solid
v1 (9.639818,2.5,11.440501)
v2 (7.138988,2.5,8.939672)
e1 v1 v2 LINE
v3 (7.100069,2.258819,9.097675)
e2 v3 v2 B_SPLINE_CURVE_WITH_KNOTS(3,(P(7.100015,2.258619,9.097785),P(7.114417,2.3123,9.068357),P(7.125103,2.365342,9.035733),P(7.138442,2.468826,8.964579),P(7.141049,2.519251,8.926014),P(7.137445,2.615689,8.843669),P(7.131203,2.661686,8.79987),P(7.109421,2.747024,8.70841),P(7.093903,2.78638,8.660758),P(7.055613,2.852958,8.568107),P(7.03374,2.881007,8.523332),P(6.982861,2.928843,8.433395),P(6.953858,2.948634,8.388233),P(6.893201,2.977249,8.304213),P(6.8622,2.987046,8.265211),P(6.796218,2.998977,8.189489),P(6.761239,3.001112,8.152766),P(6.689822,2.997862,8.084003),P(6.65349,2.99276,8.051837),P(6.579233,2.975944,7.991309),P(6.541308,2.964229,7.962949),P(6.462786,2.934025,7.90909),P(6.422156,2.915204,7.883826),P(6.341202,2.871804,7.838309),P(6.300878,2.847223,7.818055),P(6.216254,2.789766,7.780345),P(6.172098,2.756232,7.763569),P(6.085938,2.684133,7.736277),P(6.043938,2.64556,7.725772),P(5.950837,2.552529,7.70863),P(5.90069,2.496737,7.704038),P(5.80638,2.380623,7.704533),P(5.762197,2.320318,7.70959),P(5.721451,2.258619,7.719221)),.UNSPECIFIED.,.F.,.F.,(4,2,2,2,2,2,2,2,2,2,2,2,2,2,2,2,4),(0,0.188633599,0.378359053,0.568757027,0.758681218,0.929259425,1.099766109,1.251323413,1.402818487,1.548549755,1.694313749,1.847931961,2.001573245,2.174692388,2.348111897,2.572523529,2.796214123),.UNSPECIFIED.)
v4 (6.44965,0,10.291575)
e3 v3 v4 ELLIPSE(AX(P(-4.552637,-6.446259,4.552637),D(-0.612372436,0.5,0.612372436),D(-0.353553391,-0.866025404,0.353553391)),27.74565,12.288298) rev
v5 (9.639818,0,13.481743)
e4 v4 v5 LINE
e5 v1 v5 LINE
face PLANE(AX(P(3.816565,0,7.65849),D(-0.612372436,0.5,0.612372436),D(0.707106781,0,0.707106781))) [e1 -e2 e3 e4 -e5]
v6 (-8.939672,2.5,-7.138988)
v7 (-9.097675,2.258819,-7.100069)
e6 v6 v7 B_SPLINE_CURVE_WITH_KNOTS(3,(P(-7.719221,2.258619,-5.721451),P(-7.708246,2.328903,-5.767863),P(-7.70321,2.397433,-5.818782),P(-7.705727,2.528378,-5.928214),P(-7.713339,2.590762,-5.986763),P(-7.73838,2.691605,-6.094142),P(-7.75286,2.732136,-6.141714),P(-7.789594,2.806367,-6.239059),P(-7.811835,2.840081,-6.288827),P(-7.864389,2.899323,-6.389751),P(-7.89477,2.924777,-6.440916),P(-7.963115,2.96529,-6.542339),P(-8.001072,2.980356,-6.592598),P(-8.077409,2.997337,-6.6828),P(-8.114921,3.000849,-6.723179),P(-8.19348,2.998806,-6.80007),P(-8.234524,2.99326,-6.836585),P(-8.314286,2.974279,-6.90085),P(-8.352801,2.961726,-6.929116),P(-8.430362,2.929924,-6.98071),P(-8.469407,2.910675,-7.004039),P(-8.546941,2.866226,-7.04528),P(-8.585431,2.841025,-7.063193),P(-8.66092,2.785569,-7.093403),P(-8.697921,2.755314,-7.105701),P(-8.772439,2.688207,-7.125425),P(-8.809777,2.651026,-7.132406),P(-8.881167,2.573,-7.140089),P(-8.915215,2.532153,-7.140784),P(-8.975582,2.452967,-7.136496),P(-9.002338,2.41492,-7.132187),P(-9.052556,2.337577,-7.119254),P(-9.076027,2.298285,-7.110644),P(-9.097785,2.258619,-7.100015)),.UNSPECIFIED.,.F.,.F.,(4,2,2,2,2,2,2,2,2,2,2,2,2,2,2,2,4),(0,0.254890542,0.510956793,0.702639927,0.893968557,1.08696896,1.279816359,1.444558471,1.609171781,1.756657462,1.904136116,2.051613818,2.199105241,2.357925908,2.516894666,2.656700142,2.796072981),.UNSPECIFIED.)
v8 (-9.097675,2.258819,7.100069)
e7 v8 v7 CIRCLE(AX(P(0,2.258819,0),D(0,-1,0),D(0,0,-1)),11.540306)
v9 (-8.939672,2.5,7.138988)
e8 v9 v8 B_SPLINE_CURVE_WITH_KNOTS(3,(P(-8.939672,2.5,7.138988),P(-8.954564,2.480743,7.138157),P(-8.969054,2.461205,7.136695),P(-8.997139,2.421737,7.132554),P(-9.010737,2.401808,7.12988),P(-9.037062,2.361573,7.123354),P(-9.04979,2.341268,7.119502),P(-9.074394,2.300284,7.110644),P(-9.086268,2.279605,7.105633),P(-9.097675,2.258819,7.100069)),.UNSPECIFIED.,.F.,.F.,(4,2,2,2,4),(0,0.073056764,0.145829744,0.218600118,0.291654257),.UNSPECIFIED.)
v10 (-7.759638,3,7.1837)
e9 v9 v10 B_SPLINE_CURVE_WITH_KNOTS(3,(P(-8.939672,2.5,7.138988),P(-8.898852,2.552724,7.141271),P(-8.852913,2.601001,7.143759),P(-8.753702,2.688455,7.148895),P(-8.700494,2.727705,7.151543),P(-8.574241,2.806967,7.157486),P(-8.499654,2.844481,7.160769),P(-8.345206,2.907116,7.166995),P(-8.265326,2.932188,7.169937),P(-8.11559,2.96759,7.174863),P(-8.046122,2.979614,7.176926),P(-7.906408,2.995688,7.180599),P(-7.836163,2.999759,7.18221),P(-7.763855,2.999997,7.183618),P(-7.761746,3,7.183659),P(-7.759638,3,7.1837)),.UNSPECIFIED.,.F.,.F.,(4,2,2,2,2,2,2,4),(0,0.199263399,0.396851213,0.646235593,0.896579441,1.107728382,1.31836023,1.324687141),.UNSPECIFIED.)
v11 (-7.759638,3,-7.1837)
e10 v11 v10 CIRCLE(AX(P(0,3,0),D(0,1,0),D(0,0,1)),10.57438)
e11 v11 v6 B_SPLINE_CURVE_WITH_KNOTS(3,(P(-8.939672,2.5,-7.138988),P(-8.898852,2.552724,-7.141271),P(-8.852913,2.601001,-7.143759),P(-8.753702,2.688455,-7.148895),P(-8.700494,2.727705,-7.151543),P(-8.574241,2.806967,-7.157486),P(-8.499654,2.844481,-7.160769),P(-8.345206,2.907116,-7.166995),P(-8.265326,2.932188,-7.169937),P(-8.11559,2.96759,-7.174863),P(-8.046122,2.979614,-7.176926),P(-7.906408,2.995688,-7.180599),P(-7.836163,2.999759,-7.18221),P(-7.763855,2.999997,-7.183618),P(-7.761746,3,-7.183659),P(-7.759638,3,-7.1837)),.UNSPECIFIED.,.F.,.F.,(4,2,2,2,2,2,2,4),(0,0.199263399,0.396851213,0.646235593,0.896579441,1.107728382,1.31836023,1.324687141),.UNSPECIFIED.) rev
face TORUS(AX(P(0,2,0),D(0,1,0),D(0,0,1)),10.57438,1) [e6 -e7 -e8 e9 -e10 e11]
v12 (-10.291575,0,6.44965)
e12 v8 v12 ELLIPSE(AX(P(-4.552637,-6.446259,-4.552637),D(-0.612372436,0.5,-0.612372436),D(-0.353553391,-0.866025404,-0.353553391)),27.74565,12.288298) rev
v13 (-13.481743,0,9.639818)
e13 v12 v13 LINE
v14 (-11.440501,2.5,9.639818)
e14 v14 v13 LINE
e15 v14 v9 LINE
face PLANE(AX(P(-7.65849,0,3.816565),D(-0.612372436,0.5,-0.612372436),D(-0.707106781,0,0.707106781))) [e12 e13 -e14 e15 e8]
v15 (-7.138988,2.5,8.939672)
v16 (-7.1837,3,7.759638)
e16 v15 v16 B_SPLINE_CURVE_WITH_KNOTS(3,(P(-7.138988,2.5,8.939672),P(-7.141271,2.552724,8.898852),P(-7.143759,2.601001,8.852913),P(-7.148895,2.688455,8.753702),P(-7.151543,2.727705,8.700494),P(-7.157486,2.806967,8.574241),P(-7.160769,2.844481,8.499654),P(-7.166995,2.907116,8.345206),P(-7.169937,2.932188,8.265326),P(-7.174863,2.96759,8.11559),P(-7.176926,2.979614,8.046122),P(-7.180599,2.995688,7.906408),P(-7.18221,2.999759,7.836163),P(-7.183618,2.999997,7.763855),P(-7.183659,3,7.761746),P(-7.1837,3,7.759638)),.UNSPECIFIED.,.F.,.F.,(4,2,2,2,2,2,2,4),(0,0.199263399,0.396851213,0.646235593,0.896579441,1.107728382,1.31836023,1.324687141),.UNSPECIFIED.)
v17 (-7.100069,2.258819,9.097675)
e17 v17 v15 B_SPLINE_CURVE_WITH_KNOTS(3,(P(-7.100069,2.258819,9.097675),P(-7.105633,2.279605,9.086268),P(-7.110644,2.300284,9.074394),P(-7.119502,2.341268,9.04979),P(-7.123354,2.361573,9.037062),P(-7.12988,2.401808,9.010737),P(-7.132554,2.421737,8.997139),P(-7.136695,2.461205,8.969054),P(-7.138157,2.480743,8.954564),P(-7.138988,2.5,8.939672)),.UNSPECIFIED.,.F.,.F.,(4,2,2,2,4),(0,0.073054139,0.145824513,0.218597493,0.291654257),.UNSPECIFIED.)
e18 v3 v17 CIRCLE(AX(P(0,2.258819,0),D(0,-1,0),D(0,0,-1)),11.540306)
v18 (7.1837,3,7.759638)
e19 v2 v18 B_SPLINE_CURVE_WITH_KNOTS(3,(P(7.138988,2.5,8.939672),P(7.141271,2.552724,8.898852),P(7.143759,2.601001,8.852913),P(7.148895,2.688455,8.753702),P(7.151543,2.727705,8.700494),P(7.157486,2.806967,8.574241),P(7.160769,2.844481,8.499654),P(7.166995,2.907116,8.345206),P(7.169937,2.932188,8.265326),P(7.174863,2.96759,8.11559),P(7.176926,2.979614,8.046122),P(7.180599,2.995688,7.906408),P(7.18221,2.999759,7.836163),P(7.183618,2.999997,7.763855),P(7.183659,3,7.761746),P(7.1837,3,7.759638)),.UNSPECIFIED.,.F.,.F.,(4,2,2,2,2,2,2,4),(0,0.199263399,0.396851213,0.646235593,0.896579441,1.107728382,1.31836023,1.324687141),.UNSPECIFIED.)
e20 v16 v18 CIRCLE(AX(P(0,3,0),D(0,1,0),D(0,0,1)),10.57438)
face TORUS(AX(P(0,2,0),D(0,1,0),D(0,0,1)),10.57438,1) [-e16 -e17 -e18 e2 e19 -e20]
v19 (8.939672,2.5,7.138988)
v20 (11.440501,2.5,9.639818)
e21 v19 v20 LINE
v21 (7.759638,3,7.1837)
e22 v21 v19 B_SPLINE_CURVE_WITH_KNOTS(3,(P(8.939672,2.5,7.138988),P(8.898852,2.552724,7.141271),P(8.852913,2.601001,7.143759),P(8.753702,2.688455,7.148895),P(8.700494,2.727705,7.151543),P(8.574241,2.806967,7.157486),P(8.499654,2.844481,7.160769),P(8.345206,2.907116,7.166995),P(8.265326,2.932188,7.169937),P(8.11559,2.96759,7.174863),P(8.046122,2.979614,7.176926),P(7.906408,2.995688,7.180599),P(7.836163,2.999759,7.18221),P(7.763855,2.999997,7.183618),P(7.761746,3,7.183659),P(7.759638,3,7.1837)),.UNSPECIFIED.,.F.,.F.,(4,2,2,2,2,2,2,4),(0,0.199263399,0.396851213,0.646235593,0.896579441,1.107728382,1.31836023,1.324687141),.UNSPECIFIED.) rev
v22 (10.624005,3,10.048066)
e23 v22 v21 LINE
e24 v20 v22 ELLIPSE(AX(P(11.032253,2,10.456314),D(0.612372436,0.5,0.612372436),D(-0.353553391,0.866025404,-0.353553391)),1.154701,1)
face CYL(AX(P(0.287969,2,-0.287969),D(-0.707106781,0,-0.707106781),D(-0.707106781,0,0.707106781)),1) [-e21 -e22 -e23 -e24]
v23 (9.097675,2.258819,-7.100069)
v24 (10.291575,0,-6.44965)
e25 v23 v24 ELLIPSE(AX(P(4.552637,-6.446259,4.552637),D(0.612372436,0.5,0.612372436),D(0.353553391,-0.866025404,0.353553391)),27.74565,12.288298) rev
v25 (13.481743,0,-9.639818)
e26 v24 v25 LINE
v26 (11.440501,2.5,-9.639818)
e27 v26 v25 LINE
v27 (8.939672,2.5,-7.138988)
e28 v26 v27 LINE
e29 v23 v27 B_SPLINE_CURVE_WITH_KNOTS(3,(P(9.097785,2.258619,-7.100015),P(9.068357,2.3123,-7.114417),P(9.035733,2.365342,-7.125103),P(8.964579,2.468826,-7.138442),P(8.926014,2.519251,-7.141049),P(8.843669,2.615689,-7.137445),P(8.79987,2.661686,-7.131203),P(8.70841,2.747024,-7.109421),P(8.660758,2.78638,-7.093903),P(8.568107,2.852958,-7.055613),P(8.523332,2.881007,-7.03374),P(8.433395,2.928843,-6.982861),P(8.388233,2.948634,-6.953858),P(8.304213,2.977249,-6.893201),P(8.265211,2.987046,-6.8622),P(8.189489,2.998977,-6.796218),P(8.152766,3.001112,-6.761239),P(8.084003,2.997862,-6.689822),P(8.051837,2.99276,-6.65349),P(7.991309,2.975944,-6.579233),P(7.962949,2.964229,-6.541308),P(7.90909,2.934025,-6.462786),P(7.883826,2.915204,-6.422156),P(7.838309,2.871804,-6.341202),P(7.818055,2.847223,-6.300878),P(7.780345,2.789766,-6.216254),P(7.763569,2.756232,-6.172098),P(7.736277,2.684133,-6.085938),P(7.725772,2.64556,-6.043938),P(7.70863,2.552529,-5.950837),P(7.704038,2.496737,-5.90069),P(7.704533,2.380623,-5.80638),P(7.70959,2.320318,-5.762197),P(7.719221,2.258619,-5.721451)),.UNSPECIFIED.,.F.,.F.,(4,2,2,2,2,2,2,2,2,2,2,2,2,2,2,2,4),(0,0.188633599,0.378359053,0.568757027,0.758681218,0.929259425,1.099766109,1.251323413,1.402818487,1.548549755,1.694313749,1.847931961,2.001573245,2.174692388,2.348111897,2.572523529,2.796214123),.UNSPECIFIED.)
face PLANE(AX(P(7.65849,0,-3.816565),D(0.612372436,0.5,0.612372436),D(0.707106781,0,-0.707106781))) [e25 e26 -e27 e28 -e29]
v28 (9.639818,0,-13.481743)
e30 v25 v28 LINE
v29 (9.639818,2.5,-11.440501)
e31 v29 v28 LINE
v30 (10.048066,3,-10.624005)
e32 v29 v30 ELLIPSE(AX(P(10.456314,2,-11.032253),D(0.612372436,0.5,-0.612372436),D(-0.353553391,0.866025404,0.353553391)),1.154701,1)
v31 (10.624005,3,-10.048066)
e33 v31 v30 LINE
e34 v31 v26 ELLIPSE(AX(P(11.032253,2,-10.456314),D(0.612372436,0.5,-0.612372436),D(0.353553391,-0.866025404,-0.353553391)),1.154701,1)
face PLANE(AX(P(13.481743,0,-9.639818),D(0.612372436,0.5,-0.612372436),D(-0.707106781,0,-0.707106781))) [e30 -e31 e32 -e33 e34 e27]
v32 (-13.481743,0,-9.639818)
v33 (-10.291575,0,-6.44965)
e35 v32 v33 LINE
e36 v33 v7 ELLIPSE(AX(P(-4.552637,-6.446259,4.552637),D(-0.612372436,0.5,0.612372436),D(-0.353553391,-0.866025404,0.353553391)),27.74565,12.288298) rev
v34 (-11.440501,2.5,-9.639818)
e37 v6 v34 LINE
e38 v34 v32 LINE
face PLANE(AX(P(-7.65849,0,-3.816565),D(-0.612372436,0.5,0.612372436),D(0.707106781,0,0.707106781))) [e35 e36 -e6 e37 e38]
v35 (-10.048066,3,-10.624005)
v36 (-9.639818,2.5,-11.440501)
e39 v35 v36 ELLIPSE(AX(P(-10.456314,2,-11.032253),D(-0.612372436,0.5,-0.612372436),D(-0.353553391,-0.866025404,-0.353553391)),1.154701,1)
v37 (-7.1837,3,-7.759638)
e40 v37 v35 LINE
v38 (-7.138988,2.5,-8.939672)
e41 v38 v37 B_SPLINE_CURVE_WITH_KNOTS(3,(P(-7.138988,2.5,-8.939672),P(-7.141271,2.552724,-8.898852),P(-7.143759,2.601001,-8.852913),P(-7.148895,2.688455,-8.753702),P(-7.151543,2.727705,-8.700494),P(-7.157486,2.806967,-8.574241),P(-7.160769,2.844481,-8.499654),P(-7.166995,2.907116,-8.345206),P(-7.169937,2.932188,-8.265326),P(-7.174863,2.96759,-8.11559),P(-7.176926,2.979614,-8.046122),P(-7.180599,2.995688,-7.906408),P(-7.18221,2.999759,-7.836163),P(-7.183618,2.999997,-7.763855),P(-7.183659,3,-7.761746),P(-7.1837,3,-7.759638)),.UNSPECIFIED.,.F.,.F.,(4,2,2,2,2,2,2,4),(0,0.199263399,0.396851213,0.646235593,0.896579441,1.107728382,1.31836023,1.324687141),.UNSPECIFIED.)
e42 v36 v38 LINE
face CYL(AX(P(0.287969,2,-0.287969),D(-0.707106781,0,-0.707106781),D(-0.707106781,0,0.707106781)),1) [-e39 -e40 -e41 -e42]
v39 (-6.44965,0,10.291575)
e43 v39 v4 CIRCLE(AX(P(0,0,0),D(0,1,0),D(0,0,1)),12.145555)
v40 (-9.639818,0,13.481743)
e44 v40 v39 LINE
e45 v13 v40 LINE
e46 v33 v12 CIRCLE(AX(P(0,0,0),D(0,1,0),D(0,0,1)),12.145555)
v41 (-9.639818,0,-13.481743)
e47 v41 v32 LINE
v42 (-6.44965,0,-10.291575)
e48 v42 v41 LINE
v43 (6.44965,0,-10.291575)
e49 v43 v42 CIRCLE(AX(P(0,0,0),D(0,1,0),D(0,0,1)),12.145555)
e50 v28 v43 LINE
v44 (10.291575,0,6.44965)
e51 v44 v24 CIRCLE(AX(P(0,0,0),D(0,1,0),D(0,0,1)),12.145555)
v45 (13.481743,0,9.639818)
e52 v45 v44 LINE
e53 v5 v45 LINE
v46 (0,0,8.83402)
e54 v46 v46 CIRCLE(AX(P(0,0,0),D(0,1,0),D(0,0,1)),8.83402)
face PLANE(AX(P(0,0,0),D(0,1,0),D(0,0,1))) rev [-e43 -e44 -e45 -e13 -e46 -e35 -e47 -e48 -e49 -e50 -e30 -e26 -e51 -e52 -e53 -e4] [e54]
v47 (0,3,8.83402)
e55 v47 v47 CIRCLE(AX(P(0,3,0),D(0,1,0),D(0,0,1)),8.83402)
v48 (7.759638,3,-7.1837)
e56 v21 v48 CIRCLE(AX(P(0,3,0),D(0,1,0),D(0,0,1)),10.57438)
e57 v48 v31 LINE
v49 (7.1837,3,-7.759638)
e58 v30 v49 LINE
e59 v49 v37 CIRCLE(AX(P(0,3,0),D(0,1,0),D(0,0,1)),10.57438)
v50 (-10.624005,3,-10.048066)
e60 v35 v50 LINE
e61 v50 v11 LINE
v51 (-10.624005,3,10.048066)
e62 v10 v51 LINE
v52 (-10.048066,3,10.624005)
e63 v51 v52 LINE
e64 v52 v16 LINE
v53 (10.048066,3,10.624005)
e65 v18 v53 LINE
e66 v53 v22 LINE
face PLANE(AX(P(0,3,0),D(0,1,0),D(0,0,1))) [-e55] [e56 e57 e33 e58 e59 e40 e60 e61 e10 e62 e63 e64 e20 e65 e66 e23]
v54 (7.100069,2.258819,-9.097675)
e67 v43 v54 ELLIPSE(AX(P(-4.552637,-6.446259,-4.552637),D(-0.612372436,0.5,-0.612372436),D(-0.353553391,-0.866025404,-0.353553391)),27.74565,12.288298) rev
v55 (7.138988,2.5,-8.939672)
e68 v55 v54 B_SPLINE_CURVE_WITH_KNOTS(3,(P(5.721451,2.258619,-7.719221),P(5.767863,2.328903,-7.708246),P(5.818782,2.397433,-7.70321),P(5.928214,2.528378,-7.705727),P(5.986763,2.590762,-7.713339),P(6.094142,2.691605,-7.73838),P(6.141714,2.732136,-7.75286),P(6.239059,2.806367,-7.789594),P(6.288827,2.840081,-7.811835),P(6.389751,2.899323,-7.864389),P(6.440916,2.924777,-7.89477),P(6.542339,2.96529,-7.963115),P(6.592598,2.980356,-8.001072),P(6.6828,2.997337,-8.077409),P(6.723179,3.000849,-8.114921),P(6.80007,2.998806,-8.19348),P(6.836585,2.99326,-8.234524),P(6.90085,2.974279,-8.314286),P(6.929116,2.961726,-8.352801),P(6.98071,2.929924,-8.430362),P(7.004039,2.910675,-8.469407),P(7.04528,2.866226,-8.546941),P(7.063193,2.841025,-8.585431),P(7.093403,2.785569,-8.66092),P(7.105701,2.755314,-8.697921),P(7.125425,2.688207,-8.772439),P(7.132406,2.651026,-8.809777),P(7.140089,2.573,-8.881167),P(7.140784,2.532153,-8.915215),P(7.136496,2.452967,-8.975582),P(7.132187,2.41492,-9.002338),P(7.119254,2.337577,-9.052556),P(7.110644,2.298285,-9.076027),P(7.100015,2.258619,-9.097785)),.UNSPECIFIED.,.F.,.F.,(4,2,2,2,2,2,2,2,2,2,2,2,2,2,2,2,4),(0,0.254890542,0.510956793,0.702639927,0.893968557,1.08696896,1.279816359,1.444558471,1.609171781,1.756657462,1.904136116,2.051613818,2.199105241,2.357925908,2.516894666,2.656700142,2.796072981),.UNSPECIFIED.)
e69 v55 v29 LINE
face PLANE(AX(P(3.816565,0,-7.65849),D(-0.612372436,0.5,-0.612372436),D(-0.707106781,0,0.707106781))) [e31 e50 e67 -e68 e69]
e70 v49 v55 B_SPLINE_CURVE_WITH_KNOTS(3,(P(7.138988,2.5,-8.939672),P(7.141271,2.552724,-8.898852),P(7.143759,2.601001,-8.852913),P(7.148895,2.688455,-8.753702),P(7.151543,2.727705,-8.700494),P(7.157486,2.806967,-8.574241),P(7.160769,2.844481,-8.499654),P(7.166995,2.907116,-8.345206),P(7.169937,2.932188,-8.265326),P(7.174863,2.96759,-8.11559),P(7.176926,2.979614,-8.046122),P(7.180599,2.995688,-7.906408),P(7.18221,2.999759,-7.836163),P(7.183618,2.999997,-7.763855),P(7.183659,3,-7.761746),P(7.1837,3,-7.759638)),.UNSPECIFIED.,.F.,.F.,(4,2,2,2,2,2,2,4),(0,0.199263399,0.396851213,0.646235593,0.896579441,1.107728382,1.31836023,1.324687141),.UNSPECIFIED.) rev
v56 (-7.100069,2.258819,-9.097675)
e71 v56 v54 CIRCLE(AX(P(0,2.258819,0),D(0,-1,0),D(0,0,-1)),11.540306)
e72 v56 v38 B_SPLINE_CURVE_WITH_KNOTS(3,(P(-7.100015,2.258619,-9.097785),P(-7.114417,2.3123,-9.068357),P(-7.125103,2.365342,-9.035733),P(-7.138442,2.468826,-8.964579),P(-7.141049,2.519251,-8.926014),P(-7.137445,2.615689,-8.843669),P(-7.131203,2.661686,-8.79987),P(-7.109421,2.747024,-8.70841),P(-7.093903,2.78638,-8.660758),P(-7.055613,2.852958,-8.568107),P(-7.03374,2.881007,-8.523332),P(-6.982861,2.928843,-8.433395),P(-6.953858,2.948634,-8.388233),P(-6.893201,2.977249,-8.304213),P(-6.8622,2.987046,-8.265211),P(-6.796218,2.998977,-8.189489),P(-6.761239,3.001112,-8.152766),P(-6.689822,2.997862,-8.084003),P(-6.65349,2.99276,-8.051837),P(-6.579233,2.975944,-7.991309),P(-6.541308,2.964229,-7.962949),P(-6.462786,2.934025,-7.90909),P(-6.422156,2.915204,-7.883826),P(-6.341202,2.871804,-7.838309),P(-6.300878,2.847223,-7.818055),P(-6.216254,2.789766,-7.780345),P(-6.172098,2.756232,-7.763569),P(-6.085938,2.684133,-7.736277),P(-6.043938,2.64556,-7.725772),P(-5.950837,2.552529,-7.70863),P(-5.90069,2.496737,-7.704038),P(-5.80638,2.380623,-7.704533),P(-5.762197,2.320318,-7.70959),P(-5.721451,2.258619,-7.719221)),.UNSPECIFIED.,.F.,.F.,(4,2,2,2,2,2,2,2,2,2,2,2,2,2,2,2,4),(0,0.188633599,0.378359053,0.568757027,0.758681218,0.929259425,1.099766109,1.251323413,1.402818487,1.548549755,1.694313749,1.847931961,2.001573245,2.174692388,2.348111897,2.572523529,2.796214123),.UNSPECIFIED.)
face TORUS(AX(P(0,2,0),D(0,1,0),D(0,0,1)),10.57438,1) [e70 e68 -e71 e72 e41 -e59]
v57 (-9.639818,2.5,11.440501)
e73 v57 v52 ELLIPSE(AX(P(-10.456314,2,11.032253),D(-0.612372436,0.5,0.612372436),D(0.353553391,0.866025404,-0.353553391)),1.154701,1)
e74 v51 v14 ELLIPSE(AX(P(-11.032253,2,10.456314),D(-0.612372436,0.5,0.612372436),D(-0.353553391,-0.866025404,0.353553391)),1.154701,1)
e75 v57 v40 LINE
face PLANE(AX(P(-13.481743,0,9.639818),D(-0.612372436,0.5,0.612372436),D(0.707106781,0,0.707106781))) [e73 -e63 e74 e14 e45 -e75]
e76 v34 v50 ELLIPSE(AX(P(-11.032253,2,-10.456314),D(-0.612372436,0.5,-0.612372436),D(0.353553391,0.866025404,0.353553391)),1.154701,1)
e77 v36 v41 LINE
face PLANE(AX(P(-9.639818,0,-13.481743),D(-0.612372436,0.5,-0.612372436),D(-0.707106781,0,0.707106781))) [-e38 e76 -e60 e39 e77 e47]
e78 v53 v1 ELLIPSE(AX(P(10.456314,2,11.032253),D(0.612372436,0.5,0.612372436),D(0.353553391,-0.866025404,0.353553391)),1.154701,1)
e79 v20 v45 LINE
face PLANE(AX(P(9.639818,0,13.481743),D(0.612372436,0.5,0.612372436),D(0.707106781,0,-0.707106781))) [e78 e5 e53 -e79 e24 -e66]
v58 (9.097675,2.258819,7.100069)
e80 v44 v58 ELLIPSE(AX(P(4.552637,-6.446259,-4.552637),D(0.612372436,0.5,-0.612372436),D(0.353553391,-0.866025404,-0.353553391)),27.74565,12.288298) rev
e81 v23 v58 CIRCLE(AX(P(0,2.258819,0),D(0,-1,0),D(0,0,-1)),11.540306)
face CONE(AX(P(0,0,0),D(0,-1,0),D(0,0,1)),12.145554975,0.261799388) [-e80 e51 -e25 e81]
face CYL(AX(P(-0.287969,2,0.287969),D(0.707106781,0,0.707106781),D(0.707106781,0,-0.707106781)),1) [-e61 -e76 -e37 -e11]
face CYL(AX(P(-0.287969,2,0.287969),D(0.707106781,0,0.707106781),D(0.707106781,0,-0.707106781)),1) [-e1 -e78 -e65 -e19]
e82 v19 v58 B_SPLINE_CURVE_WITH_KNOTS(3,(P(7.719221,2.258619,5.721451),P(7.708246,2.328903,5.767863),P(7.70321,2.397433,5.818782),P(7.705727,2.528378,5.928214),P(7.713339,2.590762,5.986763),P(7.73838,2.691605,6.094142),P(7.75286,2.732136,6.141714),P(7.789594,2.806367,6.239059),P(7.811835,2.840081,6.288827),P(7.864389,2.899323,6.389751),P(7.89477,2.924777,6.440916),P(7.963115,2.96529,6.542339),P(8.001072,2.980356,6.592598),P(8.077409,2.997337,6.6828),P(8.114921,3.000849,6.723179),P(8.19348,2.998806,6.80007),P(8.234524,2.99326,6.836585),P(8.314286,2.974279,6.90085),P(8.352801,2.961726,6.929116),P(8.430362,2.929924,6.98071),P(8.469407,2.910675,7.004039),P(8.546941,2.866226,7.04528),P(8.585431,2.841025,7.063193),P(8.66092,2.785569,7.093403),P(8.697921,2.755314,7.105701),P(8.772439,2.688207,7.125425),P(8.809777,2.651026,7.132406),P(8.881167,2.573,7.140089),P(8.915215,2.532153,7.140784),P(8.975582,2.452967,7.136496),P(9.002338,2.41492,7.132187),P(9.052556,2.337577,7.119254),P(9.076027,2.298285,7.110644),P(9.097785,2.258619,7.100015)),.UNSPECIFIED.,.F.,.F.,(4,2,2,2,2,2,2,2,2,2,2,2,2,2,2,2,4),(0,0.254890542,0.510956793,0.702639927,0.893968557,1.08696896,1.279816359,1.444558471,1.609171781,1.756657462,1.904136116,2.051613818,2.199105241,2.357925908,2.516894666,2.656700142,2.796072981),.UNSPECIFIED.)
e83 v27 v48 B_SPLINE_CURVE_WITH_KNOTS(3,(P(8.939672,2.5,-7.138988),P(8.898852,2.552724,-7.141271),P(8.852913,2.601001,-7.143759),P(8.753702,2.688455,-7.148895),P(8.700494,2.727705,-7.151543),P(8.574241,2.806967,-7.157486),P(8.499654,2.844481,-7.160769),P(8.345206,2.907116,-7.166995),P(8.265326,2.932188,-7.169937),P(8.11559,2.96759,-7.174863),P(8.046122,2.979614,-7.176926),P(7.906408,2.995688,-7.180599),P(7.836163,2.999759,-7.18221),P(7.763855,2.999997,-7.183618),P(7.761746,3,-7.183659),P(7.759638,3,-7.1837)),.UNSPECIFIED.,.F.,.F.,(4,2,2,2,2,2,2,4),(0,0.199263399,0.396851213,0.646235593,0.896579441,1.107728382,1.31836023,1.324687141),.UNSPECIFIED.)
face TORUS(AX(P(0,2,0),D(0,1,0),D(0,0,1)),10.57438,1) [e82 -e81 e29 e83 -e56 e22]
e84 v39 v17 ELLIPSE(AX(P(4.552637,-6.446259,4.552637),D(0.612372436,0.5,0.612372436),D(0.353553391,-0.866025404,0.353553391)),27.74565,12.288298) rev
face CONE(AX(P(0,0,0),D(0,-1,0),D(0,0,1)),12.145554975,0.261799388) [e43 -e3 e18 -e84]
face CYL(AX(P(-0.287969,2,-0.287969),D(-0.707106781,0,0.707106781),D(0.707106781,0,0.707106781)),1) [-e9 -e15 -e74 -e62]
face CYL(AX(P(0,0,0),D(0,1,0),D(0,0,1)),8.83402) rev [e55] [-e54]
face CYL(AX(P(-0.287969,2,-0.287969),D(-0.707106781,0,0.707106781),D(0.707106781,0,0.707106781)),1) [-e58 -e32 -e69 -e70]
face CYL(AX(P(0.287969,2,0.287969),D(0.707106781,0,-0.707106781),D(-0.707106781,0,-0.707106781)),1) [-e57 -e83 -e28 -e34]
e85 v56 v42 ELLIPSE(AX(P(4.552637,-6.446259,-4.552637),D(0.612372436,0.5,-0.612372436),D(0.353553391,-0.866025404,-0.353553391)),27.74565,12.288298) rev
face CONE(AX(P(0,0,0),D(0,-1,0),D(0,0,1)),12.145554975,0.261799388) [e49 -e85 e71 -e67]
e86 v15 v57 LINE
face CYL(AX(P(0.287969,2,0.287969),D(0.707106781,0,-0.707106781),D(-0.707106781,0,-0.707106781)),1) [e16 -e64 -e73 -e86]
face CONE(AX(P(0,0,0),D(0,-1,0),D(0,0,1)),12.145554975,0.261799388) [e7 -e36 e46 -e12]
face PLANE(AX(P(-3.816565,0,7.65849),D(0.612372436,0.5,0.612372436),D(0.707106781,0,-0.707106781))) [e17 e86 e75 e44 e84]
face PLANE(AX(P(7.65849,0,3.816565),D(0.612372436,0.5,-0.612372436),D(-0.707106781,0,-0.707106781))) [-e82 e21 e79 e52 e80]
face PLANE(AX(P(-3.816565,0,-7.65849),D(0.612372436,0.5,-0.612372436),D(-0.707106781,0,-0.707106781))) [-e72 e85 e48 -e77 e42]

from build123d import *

# Parameters (mm, degrees)
SKETCH2_R           = 12.145554975
BOSS_EXTRUDE1_DEPTH = 3
BOSS_EXTRUDE1_TAPER = 15
BOSS_EXTRUDE2_DEPTH = 3
BOSS_EXTRUDE2_TAPER = 30
FILLET1_R           = 1
CIRPATTERN2_START   = -14.617361382
CIRPATTERN2_DEPTH   = 29.234722764
CIRPATTERN2_START_2 = -0.407249855
CIRPATTERN2_2_DEPTH = 0.81449971
CIRPATTERN2_START_3 = 2.716651032
CIRPATTERN2_3_DEPTH = 13.632761157
CIRPATTERN2_START_4 = -2.716651132
CIRPATTERN2_4_DEPTH = 5.433302164
CIRPATTERN2_START_5 = -11.369329343
CIRPATTERN2_5_DEPTH = 22.738655401
CIRPATTERN2_START_6 = -17
CIRPATTERN2_6_DEPTH = 2.382638618
CIRPATTERN2_START_7 = 14.617361382
CIRPATTERN2_7_DEPTH = 2.382638618
SKETCH4_R           = 8.834020379
CUT_EXTRUDE1_DEPTH  = 20.300641771


with BuildPart() as part:
    # Sketch2 → Boss-Extrude1 (new body)
    with BuildSketch(Plane(origin=(0, 0, 0), x_dir=(1, 0, 0), z_dir=(0, 1, 0))):
        Circle(SKETCH2_R)
    extrude(amount=BOSS_EXTRUDE1_DEPTH, taper=BOSS_EXTRUDE1_TAPER)

    # Sketch3 → Boss-Extrude2 (add)
    with BuildSketch(Plane(origin=(0, 0, 0), x_dir=(1, 0, 0), z_dir=(0, 1, 0))):
        Polygon((-7.65848972, -3.816564986), (-13.481742595, -9.639817861), (-9.639817861, -13.481742595), (-3.816564986, -7.65848972), align=None)
    extrude(amount=BOSS_EXTRUDE2_DEPTH, taper=BOSS_EXTRUDE2_TAPER)

    # Fillet1
    fillet1_edges = [part.edges().sort_by_distance(p)[0] for p in [
        (-8.466560643, 3, 9.858995634),
        (-9.858995634, 3, 8.466560643),
        (-3.880929208, 3, -10.657050022),
    ]]
    fillet(fillet1_edges, radius=FILLET1_R)

    # CirPattern2: read off the stored shape, not the designer's step
    # CirPattern2 outline → CirPattern2 (add)
    with BuildSketch(Plane(origin=(0, 0, 0), x_dir=(0.707106781186545, 0, -0.70710678118655), z_dir=(0.70710678118655, 0, 0.707106781186545)).offset(CIRPATTERN2_START)):
        with BuildLine():
            ThreePointArc((1.273275359, 2.5), (0.907249955, 2.866025404), (0.407249955, 3))
            Line((0.407249955, 3), (-0.407249955, 3))
            ThreePointArc((-0.407249955, 3), (-0.907249955, 2.866025404), (-1.273275359, 2.5))
            Line((-1.273275359, 2.5), (-2.716651032, 0))
            Line((-2.716651032, 0), (2.716651032, 0))
            Line((2.716651032, 0), (1.273275359, 2.5))
        make_face()
    extrude(amount=CIRPATTERN2_DEPTH)

    # CirPattern2 2 outline → CirPattern2 2 (add)
    with BuildSketch(Plane(origin=(0, 0, 0), x_dir=(0.707106781186545, 0, -0.70710678118655), z_dir=(0.70710678118655, 0, 0.707106781186545)).offset(CIRPATTERN2_START_2)):
        with BuildLine():
            Line((16.349412189, 0), (14.617361382, 3))
            Line((14.617361382, 3), (0.407249955, 3))
            ThreePointArc((0.407249955, 3), (0.907249955, 2.866025404), (1.273275359, 2.5))
            Line((1.273275359, 2.5), (2.716651032, 0))
            Line((2.716651032, 0), (16.349412189, 0))
        make_face()
    extrude(amount=CIRPATTERN2_2_DEPTH)

    # CirPattern2 3 outline → CirPattern2 3 (add)
    with BuildSketch(Plane(origin=(0, 0, 0), x_dir=(0.707106781186548, 0, 0.707106781186547), z_dir=(0.707106781186547, 0, -0.707106781186548)).offset(CIRPATTERN2_START_3)):
        with BuildLine():
            Line((2.716651032, 0), (0.407249855, 0))
            Line((0.407249855, 0), (0.407249955, -3))
            ThreePointArc((0.407249955, -3), (0.907249955, -2.866025404), (1.273275359, -2.5))
            Line((1.273275359, -2.5), (2.716651032, 0))
        make_face()
        with BuildLine():
            Line((-0.407249855, 0), (-2.716651032, 0))
            Line((-2.716651032, 0), (-1.273275359, -2.5))
            ThreePointArc((-1.273275359, -2.5), (-0.907249955, -2.866025404), (-0.407249955, -3))
            Line((-0.407249955, -3), (-0.407249855, 0))
        make_face()
    extrude(amount=CIRPATTERN2_3_DEPTH)

    # CirPattern2 4 outline → CirPattern2 4 (add)
    with BuildSketch(Plane(origin=(0, 0, 0), x_dir=(0.707106781186548, 0, 0.707106781186547), z_dir=(0.707106781186547, 0, -0.707106781186548)).offset(CIRPATTERN2_START_4)):
        Polygon((16.349412189, 0), (14.617361382, 0), (14.617361382, -3), align=None)
        Polygon((-14.617361382, 0), (-16.349412189, 0), (-14.617361382, -3), align=None)
    extrude(amount=CIRPATTERN2_4_DEPTH)

    # CirPattern2 5 outline → CirPattern2 5 (cut)
    with BuildSketch(Plane(origin=(0, 0, 0), x_dir=(0.7071067811865451, 0, -0.7071067811865499), z_dir=(0.7071067811865498, 0, 0.7071067811865454)).offset(CIRPATTERN2_START_5)):
        Polygon((14.617361382, 3), (16.349412189, 0), (16.349412189, 3), align=None)
    extrude(amount=CIRPATTERN2_5_DEPTH, mode=Mode.SUBTRACT)

    # CirPattern2 6 outline → CirPattern2 6 (cut)
    with BuildSketch(Plane(origin=(0, 0, 0), x_dir=(0.7071067811865451, 0, -0.7071067811865499), z_dir=(0.7071067811865498, 0, 0.7071067811865454)).offset(CIRPATTERN2_START_6)):
        with BuildLine():
            Line((-0.407249955, 3), (-2.716651132, 3))
            Line((-2.716651132, 3), (-2.716651132, 0))
            Line((-2.716651132, 0), (-1.273275359, 2.5))
            ThreePointArc((-1.273275359, 2.5), (-0.907249955, 2.866025404), (-0.407249955, 3))
        make_face()
        with BuildLine():
            Line((2.716651032, 3), (0.407249955, 3))
            ThreePointArc((0.407249955, 3), (0.907249955, 2.866025404), (1.273275359, 2.5))
            Line((1.273275359, 2.5), (2.716651032, 0))
            Line((2.716651032, 0), (2.716651032, 3))
        make_face()
    extrude(amount=CIRPATTERN2_6_DEPTH, mode=Mode.SUBTRACT)

    # CirPattern2 7 outline → CirPattern2 7 (cut)
    with BuildSketch(Plane(origin=(0, 0, 0), x_dir=(0.7071067811865451, 0, -0.7071067811865499), z_dir=(0.7071067811865498, 0, 0.7071067811865454)).offset(CIRPATTERN2_START_7)):
        with BuildLine():
            Line((-0.407249955, 3), (-2.716651132, 3))
            Line((-2.716651132, 3), (-2.716651132, 0))
            Line((-2.716651132, 0), (-1.273275359, 2.5))
            ThreePointArc((-1.273275359, 2.5), (-0.907249955, 2.866025404), (-0.407249955, 3))
        make_face()
        with BuildLine():
            Line((2.716651032, 3), (0.407249955, 3))
            ThreePointArc((0.407249955, 3), (0.907249955, 2.866025404), (1.273275359, 2.5))
            Line((1.273275359, 2.5), (2.716651032, 0))
            Line((2.716651032, 0), (2.716651032, 3))
        make_face()
    extrude(amount=CIRPATTERN2_7_DEPTH, mode=Mode.SUBTRACT)

    # Sketch4 → Cut-Extrude1 (cut, through all)
    with BuildSketch(Plane(origin=(0, 3, 0), x_dir=(1, 0, 0), z_dir=(0, 1, 0))):
        with Locations(Location((0, 0, 0), (0, 0, 270))):
            Circle(SKETCH4_R)
    extrude(amount=-CUT_EXTRUDE1_DEPTH, mode=Mode.SUBTRACT)


solid = part.part
